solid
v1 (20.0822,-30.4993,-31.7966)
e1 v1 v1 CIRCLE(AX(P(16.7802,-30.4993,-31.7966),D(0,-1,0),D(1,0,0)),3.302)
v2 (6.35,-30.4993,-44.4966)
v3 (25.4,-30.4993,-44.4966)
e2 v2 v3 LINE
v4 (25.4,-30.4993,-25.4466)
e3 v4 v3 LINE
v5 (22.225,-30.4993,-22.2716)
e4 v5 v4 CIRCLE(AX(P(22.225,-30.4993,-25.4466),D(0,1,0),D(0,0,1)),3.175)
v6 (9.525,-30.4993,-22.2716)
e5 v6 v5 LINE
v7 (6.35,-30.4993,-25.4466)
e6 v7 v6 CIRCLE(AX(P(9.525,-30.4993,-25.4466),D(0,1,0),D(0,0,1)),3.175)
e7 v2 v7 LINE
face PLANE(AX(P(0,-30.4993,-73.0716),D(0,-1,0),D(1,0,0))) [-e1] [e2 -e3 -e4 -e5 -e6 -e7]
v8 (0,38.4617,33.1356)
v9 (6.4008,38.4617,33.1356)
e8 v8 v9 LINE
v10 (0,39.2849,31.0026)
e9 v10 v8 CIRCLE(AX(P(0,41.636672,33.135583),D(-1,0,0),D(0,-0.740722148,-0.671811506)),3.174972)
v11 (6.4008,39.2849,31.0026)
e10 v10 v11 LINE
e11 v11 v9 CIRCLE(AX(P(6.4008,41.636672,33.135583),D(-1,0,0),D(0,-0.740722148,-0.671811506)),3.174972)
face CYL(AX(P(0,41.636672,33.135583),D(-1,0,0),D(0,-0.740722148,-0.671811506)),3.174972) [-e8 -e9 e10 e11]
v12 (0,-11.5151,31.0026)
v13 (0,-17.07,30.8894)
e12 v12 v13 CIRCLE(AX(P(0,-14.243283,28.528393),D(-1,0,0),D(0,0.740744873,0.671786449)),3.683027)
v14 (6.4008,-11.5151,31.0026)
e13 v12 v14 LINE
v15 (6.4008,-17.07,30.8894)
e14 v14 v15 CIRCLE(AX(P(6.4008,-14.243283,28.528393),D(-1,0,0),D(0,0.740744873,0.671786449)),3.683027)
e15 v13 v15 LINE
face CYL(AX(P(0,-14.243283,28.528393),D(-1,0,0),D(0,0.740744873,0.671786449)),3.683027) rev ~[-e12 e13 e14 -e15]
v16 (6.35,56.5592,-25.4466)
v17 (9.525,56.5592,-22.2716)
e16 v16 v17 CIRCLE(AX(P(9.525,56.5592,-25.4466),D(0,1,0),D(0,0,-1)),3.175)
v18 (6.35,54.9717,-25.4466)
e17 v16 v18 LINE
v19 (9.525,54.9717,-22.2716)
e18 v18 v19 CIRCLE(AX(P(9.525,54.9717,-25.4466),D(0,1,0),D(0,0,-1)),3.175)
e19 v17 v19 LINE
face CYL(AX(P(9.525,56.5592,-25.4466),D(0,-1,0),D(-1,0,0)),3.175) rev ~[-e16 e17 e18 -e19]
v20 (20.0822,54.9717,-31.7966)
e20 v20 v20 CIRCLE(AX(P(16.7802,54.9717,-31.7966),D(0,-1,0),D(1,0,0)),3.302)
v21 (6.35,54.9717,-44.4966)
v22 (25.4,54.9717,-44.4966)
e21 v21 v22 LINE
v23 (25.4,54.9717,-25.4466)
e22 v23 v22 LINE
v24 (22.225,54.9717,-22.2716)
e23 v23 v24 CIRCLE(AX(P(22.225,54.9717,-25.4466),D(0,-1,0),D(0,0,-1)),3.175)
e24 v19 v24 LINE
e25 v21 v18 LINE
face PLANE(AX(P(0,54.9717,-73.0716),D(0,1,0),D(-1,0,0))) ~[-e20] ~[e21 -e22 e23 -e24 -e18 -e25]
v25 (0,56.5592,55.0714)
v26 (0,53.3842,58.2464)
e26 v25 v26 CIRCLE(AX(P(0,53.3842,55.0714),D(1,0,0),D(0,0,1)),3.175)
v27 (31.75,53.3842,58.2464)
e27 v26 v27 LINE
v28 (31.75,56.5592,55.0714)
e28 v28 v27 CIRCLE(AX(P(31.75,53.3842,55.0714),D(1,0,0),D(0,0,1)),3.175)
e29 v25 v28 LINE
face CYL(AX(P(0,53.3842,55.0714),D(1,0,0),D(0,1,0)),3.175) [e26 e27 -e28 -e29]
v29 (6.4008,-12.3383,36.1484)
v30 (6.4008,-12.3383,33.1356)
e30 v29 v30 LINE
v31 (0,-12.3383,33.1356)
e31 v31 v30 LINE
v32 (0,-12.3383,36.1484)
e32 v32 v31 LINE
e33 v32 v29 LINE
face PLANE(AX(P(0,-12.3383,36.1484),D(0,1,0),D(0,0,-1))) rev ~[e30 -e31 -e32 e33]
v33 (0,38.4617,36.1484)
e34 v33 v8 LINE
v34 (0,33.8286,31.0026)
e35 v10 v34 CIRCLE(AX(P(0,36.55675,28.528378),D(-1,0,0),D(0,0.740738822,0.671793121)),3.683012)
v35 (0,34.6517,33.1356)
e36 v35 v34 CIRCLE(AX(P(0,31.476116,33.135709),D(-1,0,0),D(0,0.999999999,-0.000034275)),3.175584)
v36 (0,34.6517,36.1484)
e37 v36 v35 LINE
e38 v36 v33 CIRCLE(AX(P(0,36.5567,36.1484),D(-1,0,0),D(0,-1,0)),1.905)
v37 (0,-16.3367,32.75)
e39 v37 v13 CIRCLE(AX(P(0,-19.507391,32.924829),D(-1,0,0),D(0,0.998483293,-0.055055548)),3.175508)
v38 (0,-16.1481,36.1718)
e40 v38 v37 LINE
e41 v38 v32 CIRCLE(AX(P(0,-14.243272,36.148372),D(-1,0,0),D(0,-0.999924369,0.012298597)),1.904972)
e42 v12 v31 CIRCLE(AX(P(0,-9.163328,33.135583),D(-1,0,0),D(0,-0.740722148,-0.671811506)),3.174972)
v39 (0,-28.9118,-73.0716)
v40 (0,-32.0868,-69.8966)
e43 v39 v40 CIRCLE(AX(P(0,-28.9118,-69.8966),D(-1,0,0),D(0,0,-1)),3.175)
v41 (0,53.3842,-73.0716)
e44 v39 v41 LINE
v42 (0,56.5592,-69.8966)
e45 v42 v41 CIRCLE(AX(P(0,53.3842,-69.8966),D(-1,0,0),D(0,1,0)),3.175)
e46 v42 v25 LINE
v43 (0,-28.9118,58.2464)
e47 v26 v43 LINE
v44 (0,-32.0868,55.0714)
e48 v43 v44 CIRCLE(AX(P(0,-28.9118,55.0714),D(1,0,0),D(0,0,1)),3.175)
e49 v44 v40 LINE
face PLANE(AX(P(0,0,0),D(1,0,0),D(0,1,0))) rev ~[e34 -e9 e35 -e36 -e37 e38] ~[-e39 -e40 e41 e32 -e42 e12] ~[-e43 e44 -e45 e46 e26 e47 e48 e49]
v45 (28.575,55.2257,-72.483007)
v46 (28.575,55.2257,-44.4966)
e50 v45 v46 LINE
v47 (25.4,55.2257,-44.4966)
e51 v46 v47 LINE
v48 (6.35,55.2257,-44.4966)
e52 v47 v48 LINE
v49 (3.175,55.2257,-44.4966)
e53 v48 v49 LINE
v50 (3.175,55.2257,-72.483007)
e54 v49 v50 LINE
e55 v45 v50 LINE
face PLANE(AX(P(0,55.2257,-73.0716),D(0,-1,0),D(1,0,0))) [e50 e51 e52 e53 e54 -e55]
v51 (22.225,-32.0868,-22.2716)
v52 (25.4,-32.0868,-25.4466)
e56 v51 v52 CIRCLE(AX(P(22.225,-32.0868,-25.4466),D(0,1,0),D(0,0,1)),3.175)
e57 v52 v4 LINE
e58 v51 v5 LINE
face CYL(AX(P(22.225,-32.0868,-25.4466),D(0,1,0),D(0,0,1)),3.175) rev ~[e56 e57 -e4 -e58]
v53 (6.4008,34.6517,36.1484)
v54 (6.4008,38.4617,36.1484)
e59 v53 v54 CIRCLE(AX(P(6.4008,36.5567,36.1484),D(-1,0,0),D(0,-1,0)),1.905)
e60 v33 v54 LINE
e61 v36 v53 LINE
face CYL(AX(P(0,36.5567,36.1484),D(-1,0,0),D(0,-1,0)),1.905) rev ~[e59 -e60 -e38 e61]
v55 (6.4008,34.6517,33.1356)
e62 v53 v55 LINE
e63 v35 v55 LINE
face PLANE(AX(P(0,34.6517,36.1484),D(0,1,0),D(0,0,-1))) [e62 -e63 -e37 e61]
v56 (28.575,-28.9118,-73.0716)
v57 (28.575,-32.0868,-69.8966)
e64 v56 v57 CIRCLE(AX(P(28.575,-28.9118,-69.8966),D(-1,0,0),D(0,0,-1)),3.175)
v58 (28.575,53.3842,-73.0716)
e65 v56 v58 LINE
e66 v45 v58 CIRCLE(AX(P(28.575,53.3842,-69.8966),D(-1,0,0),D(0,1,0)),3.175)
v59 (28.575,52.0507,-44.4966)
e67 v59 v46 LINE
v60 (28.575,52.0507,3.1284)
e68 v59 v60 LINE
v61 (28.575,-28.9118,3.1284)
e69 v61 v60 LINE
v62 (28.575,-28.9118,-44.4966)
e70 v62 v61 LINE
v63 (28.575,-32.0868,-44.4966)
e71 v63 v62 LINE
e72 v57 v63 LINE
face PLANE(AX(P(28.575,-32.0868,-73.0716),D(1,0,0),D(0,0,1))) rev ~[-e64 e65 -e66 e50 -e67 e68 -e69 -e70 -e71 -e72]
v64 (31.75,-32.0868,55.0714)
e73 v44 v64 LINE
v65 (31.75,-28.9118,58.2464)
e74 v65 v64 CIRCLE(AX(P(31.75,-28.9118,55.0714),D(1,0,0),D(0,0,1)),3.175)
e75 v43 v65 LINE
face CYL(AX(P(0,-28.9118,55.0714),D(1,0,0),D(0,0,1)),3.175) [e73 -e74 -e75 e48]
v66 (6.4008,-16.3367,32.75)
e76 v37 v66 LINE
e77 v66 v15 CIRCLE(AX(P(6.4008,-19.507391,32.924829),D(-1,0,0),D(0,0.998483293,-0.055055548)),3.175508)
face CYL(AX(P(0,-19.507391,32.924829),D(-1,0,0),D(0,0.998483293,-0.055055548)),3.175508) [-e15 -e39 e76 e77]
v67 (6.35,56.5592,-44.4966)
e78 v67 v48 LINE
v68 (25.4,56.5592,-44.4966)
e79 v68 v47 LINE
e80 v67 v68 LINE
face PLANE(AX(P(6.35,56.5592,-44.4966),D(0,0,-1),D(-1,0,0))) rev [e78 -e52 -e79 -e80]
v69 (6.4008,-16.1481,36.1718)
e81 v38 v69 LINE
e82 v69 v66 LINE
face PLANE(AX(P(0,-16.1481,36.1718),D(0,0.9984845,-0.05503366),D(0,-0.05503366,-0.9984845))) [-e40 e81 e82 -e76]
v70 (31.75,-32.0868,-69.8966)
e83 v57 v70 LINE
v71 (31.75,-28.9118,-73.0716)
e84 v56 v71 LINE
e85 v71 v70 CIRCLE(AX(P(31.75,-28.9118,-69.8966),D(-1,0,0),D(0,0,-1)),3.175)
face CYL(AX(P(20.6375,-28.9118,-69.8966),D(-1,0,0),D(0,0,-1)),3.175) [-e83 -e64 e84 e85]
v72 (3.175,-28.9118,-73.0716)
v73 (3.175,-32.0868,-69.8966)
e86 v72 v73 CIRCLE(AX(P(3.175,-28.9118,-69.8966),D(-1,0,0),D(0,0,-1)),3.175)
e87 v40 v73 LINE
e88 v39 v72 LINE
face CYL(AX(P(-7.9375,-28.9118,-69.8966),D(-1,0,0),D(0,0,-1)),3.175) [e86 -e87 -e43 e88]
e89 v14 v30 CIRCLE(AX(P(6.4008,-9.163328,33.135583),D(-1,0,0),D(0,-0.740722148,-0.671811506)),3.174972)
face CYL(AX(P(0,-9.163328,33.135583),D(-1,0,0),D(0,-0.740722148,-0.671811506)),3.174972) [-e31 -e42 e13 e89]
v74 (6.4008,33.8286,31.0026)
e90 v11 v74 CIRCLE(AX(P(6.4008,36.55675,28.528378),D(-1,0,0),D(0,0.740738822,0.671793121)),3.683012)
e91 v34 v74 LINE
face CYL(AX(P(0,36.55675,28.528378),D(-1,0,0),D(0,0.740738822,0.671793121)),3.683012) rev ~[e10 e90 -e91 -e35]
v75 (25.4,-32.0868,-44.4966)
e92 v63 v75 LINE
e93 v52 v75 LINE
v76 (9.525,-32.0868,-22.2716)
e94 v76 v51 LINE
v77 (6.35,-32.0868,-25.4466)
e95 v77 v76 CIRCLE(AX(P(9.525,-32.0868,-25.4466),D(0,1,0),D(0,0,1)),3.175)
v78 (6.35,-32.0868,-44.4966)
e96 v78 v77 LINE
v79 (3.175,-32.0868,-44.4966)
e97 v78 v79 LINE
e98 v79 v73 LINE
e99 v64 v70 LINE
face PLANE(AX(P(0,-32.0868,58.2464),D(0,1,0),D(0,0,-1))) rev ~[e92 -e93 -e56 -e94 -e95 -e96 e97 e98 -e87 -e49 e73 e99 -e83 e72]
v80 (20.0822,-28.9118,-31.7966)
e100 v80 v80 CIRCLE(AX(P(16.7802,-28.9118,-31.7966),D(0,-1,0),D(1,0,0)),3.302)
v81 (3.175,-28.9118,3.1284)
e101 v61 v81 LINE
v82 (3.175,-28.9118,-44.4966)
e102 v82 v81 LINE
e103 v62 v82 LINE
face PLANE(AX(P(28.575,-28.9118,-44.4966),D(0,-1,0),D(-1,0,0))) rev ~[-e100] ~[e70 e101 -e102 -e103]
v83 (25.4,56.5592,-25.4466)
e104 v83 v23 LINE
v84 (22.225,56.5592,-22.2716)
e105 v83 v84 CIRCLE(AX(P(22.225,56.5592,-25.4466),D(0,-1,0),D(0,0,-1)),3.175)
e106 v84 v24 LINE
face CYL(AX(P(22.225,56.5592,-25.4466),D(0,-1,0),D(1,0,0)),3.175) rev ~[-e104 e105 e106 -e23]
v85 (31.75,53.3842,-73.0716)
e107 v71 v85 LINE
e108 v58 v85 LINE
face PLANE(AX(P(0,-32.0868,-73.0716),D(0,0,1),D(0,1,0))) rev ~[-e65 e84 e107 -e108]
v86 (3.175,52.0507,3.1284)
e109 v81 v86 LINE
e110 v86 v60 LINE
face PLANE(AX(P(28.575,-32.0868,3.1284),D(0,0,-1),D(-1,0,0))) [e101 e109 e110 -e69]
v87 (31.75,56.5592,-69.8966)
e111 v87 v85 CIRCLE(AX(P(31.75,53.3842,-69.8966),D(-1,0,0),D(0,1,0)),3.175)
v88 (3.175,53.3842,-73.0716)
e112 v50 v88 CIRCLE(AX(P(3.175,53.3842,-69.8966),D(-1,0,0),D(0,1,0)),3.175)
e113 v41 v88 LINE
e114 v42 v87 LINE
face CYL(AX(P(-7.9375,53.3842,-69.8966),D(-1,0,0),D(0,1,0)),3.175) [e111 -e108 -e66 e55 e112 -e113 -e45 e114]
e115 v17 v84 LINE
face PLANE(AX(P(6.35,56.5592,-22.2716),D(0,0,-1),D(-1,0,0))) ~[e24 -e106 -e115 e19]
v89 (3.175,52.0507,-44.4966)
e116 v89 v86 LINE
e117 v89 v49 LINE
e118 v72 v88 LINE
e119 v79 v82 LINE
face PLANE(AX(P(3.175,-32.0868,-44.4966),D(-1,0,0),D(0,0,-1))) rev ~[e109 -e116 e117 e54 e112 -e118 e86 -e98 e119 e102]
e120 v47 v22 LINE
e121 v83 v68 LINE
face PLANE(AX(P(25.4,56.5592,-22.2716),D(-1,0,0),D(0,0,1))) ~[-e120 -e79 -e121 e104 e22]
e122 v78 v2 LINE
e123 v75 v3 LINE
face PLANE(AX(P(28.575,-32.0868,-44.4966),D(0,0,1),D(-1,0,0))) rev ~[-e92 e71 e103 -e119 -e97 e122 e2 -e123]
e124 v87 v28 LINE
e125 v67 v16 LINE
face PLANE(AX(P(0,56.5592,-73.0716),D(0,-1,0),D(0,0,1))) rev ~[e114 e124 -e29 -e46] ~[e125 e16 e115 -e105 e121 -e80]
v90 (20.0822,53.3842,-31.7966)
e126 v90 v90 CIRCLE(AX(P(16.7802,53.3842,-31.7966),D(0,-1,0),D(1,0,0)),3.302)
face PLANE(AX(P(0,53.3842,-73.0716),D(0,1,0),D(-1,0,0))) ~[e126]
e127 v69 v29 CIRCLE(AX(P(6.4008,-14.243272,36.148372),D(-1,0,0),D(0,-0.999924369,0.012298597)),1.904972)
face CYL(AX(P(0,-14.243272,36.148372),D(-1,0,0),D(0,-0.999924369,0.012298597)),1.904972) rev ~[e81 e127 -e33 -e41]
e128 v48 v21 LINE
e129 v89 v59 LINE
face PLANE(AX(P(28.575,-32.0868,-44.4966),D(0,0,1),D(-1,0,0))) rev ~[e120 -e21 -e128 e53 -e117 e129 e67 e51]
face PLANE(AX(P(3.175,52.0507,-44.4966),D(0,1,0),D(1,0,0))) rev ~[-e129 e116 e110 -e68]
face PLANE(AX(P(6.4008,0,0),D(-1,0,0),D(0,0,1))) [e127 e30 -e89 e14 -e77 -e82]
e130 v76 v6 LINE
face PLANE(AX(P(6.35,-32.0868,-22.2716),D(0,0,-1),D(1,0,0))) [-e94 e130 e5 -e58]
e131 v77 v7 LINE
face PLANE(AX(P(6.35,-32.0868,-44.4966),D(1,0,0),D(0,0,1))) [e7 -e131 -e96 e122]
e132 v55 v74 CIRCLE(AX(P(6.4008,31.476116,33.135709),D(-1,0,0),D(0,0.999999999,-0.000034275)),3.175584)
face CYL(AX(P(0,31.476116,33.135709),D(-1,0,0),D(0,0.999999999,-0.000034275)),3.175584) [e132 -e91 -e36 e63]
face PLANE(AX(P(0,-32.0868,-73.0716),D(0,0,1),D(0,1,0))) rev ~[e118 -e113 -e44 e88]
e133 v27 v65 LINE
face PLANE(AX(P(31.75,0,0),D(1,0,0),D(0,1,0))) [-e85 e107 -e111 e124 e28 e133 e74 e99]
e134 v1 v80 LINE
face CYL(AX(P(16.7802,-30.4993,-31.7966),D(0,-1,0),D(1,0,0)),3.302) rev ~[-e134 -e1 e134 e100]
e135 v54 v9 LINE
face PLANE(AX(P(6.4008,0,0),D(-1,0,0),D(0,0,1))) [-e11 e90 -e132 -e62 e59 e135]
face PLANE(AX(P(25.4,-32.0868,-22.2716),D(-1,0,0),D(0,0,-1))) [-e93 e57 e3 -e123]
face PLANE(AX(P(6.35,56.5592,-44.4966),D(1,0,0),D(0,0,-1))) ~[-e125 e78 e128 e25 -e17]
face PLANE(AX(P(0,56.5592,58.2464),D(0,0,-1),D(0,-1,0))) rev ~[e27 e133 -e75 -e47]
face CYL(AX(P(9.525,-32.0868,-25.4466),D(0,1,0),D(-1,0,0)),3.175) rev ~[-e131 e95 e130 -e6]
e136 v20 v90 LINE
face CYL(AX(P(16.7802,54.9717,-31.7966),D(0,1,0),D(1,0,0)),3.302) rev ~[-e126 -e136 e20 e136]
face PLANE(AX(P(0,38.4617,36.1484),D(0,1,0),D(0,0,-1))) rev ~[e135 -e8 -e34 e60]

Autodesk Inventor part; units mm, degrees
ref_plane "YZ Plane" through (0, 0, 0) normal (1, 0, 0) x (0, 1, 0)
ref_plane "XZ Plane" through (0, 0, 0) normal (0, 1, 0) x (-1, 0, 0)
ref_plane "XY Plane" through (0, 0, 0) normal (0, 0, 1) x (1, 0, 0)
sketch "Sketch1" plane through (0, 0, 0) normal (1, 0, 0) x (0, 1, 0)
  line L0 (56.5592, 58.2464) -> (-32.0868, 58.2464)
  line L1 (-32.0868, 58.2464) -> (-32.0868, -73.0716)
  line L2 (-32.0868, -73.0716) -> (56.5592, -73.0716)
  line L3 (56.5592, -73.0716) -> (56.5592, 58.2464)
  point P0 (0, 0)
  dimension "d0" = 131.318
  dimension "d1" = 88.646
extrude "Extrusion1" add sketch "Sketch1" along normal blind 31.75
sketch "Sketch2" plane through (0, -32.0868, -73.0716) normal (0, -1, 0) x (1, 0, 0)
  line L0 (31.75, 131.318) -> (31.75, 0) projected
  line L1 (0, 131.318) -> (0, 0) projected
  line L2 (28.575, 28.575) -> (3.175, 28.575)
  line L3 (3.175, 28.575) -> (3.175, 0)
  line L4 (3.175, 0) -> (28.575, 0)
  line L5 (28.575, 0) -> (28.575, 28.575)
  point P0 (0, 73.0716)
  point P1 (31.75, 28.575)
  dimension "d7" = 3.175
  dimension "d8" = 3.175
  dimension "d9" = 28.575
extrude "Extrusion2" cut sketch "Sketch2" against normal blind 87.3125
sketch "Sketch3" plane through (28.575, -32.0868, -44.4966) normal (0, 0, -1) x (-1, 0, 0)
  line L0 (0, 0) -> (0, 87.3125) projected
  line L1 (25.4, 0) -> (25.4, 87.3125) projected
  line L2 (0, 3.175) -> (25.4, 3.175)
  line L3 (25.4, 3.175) -> (25.4, 84.1375)
  line L4 (25.4, 84.1375) -> (0, 84.1375)
  line L5 (0, 84.1375) -> (0, 3.175)
  line L6 (0, 87.3125) -> (25.4, 87.3125) projected
  line L7 (25.4, 0) -> (0, 0) projected
  point P0 (28.575, 32.0868)
  point P1 (12.7, 84.1375)
  point P2 (12.7, 3.175)
  point P3 (0, 84.1375)
  point P4 (25.4, 3.175)
  dimension "d10" = 3.175
  dimension "d11" = 3.175
extrude "Extrusion3" cut sketch "Sketch3" against normal blind 47.625 contours L0 L4 L1 L2
sketch "Sketch4" plane through (0, -32.0868, -73.0716) normal (0, -1, 0) x (1, 0, 0)
  line L0 (3.175, 28.575) -> (28.575, 28.575) projected
  line L1 (25.4, 28.575) -> (6.35, 28.575)
  line L2 (6.35, 28.575) -> (6.35, 50.8)
  line L3 (6.35, 50.8) -> (25.4, 50.8)
  line L4 (25.4, 50.8) -> (25.4, 28.575)
  line L5 (31.75, 131.318) -> (31.75, 0) projected
  circle A0 centre (16.7802, 41.275) radius 3.302
  point P0 (0, 73.0716)
  point P1 (15.875, 50.8)
  point P2 (15.875, 28.575)
  point P3 (25.4, 39.6875)
  point P4 (6.35, 28.575)
  dimension "d14" = 22.225
  dimension "d15" = 19.05
  dimension "d16" = 6.35
  dimension "d17" = 6.604
  dimension "d18" = 12.7
extrude "Extrusion4" cut sketch "Sketch4" against normal blind 1.5875
sketch "Sketch6" plane through (0, -30.4993, -73.0716) normal (0, -1, 0) x (1, 0, 0)
  circle A0 centre (16.7802, 41.275) radius 3.302 projected
  circle A1 centre (16.7802, 41.275) radius 3.302
  point P0 (0, 73.0716)
extrude "Extrusion5" cut sketch "Sketch6" along normal mid plane 3.175
ref_plane "Work Plane2" through (0, 12.2362, -73.0716) normal (0, -1, 0) x (1, 0, 0)
mirror "Mirror1" about plane through (0, 12.2362, -73.0716) normal (0, -1, 0) of "Extrusion4"
mirror "Mirror2" about plane through (0, 12.2362, -73.0716) normal (0, -1, 0) of "Extrusion5"
fillet "Fillet1" radius 3.175 3 edges at (30.1625, -32.0868, -73.0716) (1.5875, -32.0868, -73.0716) (15.875, 56.5592, -73.0716)
fillet "Fillet2" radius 3.175 2 edges at (15.875, -32.0868, 58.2464) (15.875, 56.5592, 58.2464)
fillet "Fillet3" radius 3.175 4 edges at (6.35, -31.293, -22.2716) (25.4, -31.293, -22.2716) (25.4, 55.7655, -22.2716) (6.35, 55.7655, -22.2716)
sketch "Sketch8" plane through (0, 0, 0) normal (-1, 0, 0) x (0, 0, 1)
  line L0 (-69.8966, 56.5592) -> (55.0714, 56.5592) projected
  line L1 (-73.0716, -28.9118) -> (-73.0716, 53.3842) projected
  arc A0 (31.0026, -11.5151) -> (30.8894, -17.07) centre (28.5284, -14.2433) ccw
  arc A1 (36.1718, -16.1481) -> (36.1484, -12.3383) centre (36.1484, -14.2433) ccw
  line L2 (36.1484, -12.3383) -> (33.1356, -12.3383)
  line L3 (36.1718, -16.1481) -> (32.75, -16.3367)
  arc A2 (31.0026, -11.5151) -> (33.1356, -12.3383) centre (33.1356, -9.1633) ccw
  arc A3 (32.75, -16.3367) -> (30.8894, -17.07) centre (32.9247, -19.5068) ccw
  line L4 (55.0714, -32.0868) -> (-69.8966, -32.0868) projected
  arc A4 (31.0026, 39.2849) -> (31.0026, 33.8286) centre (28.5284, 36.5567) ccw
  arc A5 (36.1484, 34.6517) -> (36.1484, 38.4617) centre (36.1484, 36.5567) ccw
  line L5 (36.1484, 38.4617) -> (33.1356, 38.4617)
  line L6 (36.1484, 34.6517) -> (33.1356, 34.6517)
  arc A6 (31.0026, 39.2849) -> (33.1356, 38.4617) centre (33.1356, 41.6367) ccw
  arc A7 (33.1356, 34.6517) -> (31.0026, 33.8286) centre (33.1356, 31.4767) ccw
  point P0 (0, 0)
  point P1 (31.6805, -12.3383)
  point P2 (31.5103, -16.405)
  point P3 (31.8314, 36.8525)
  point P4 (31.2779, 32.7727)
  point P5 (31.6805, 38.4617)
  point P6 (31.6805, 34.6517)
  dimension "d57" = 3.81
  dimension "d58" = 7.366
  dimension "d59" = 3.175
  dimension "d60" = 101.6
  dimension "d61" = 109.22
  dimension "d63" = 0
  dimension "d77" = 101.6
  dimension "d78" = 109.22
  dimension "d79" = 50.8
  dimension "d80" = 20.0025
  dimension "d81" = 3.81
  dimension "d82" = 7.366
  dimension "d83" = 3.175
extrude "Extrusion7" cut sketch "Sketch8" against normal blind 6.4008
properties part number "cDAQ_Chassis_LowPolyPlaceholder"
